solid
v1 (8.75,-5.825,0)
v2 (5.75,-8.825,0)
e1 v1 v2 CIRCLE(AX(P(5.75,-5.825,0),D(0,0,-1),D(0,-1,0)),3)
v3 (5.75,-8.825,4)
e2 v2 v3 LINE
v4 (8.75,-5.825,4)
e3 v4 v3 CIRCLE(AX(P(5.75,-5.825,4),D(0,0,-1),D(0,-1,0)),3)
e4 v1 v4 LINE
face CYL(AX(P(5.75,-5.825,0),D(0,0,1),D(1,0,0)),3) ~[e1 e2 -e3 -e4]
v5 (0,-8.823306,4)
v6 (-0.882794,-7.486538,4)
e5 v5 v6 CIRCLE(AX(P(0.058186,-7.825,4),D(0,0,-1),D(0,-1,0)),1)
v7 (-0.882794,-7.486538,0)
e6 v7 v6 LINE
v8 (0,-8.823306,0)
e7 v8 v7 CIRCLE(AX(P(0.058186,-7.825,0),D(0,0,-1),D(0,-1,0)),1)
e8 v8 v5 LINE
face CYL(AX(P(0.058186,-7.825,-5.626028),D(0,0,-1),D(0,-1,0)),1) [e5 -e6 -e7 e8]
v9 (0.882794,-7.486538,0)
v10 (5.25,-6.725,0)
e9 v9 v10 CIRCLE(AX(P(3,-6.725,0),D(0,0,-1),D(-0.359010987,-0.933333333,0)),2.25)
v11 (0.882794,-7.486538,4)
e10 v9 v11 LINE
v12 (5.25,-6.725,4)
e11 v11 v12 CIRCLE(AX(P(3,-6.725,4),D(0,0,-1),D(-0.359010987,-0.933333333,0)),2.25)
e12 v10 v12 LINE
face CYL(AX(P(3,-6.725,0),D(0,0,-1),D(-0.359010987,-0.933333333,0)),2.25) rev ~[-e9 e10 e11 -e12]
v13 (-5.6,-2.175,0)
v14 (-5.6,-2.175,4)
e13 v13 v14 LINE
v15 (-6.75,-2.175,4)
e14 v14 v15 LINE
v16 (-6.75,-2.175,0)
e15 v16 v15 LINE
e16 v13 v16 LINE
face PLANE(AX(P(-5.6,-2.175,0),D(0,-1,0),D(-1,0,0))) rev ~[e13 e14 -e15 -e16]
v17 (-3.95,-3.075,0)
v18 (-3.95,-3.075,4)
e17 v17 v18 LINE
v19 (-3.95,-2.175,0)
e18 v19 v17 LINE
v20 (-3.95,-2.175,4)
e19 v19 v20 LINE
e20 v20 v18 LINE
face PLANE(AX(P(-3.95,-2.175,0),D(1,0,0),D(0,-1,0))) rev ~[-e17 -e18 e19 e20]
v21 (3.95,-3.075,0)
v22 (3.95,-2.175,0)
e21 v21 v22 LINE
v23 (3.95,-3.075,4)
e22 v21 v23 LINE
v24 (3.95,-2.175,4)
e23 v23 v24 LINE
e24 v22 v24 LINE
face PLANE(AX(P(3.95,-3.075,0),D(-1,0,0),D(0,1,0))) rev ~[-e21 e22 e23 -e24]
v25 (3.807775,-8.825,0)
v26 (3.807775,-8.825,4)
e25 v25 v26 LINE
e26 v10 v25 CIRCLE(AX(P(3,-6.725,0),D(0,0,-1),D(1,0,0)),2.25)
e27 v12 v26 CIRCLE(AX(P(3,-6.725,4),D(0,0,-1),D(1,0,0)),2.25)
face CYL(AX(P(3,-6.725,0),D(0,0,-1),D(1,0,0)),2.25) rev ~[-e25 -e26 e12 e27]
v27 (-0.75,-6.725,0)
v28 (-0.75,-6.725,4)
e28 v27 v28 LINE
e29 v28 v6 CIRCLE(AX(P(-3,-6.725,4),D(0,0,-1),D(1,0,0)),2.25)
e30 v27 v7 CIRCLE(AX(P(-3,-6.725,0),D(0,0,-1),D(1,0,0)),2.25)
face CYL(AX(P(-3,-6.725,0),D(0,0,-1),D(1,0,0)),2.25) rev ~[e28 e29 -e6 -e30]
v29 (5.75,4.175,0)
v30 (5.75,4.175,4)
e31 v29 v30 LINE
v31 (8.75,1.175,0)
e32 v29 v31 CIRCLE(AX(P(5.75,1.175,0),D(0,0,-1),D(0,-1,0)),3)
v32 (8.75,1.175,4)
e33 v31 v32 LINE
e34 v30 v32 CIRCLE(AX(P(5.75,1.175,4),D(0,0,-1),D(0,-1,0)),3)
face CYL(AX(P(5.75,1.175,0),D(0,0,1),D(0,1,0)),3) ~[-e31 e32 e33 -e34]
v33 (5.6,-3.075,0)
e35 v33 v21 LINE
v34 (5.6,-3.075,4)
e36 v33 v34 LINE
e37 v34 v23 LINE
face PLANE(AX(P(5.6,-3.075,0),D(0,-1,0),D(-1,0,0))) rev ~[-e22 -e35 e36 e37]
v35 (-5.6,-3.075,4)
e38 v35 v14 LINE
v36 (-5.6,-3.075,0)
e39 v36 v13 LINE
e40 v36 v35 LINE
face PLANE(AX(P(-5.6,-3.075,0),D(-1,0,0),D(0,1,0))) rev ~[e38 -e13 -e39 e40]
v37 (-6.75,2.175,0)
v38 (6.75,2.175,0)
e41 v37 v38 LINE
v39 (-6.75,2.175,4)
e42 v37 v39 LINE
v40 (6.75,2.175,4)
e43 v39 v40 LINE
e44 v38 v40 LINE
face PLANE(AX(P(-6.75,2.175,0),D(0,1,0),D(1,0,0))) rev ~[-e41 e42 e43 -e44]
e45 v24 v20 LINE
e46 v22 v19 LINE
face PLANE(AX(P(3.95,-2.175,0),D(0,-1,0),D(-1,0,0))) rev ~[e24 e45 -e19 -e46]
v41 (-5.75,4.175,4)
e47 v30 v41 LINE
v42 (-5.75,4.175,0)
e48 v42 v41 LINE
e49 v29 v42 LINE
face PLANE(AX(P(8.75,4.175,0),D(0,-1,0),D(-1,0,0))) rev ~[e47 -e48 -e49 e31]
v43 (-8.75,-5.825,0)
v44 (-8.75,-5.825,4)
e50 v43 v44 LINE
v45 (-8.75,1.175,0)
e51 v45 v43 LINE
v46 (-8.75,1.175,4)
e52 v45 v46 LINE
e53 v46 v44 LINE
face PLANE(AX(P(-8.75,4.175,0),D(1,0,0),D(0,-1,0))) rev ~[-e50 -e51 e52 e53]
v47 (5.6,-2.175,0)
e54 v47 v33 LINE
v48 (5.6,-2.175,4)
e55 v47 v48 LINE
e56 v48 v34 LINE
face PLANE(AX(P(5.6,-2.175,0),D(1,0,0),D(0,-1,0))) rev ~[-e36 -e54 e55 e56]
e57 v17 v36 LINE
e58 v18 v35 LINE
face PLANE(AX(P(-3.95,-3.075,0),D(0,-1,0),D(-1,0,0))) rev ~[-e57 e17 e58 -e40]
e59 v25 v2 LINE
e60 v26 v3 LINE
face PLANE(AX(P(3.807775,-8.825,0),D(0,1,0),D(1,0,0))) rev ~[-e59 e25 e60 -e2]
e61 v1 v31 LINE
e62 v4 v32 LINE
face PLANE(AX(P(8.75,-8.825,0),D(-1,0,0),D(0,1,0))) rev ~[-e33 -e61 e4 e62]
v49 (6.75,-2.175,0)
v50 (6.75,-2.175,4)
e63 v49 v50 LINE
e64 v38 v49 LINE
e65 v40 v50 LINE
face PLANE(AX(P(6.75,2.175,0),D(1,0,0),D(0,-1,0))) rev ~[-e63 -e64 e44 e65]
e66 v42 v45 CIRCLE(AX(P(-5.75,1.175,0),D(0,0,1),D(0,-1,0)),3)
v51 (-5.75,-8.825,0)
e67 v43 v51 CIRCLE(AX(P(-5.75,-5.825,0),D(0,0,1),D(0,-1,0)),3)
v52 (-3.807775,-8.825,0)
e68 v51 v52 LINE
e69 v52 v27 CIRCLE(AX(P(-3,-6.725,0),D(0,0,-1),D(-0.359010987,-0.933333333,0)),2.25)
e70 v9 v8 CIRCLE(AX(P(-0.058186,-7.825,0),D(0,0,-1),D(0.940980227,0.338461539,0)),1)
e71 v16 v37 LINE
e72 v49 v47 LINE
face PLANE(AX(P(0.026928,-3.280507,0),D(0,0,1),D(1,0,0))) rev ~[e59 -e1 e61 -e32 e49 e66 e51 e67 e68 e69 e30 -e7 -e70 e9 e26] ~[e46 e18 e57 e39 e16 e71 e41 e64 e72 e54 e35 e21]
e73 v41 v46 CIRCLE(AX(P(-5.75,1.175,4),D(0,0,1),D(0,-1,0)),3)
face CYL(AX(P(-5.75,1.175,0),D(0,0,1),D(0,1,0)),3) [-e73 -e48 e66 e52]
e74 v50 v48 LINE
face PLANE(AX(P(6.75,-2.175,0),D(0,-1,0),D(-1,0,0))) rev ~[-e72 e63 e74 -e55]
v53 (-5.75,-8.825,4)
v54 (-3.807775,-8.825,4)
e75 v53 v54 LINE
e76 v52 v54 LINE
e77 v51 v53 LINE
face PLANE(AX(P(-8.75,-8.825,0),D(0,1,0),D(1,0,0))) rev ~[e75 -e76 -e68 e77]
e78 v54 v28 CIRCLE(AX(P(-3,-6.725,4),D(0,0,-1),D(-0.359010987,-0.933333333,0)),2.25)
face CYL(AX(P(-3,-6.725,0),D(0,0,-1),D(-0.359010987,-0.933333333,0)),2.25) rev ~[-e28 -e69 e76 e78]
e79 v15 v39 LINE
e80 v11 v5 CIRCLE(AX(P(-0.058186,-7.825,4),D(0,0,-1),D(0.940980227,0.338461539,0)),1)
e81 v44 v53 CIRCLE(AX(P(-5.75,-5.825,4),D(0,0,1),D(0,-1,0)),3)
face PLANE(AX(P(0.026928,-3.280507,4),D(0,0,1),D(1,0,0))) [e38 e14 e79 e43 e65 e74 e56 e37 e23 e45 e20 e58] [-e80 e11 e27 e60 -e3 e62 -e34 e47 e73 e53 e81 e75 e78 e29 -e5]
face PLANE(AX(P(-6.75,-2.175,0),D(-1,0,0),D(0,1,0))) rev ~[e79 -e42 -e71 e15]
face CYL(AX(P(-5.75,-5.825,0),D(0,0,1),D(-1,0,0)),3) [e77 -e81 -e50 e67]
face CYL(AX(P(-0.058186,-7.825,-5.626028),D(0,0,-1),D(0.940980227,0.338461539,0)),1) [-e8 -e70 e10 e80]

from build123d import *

# Parameters (mm, degrees)
F1_DEPTH    = 4
F2_R        = 3
F3_T1_DEPTH = 15.252055078


# Not quite as in the source:
# - a fillet or chamfer that OpenCascade refuses, or shapes differently, is made with other operations: its cross-section is extruded or revolved along the edge and cut away or added


with BuildPart() as f1:
    # F0 (on Top) → F1 (new body)
    with BuildSketch(Plane.XY):
        with BuildLine():
            Line((8.75, 4.175), (-8.75, 4.175))
            Line((-8.75, 4.175), (-8.75, -8.825))
            Line((-8.75, -8.825), (-3.8077747211, -8.825))
            ThreePointArc((-3.8077747211, -8.825), (-4.2737752701, -4.8702772279), (-0.75, -6.725))
            ThreePointArc((-0.75, -6.725), (-1.1452772279, -7.9987752701), (-2.1922252789, -8.825))
            Line((-2.1922252789, -8.825), (2.1922252789, -8.825))
            ThreePointArc((2.1922252789, -8.825), (1.7262247299, -4.8702772279), (5.25, -6.725))
            ThreePointArc((5.25, -6.725), (4.8547227721, -7.9987752701), (3.8077747211, -8.825))
            Line((3.8077747211, -8.825), (8.75, -8.825))
            Line((8.75, -8.825), (8.75, 4.175))
        make_face()
        Polygon((-6.75, 2.175), (6.75, 2.175), (6.75, -2.175), (5.6, -2.175), (5.6, -3.075), (3.95, -3.075), (3.95, -2.175), (-3.95, -2.175), (-3.95, -3.075), (-5.6, -3.075), (-5.6, -2.175), (-6.75, -2.175), align=None, mode=Mode.SUBTRACT)
    extrude(amount=F1_DEPTH)

    # F2
    f2_edges = [f1.edges().sort_by_distance(p)[0] for p in [
        (-8.75, 4.175, 2),
        (-8.75, -8.825, 2),
        (8.75, -8.825, 2),
        (8.75, 4.175, 2),
    ]]
    fillet(f2_edges, radius=F2_R)

    # F3: fillet of radius 1 on 2 edges, made by hand

    # F3_s2 → F3_t1 (cut)
    with BuildSketch(Plane.XY.offset(-5.626027539)):
        with BuildLine():
            ThreePointArc((0.88279449, -7.4865384615), (0.7598795231, -8.4001254044), (-0.0581857367, -8.825))
            Line((-0.0581857367, -8.825), (2.1922252789, -8.825))
            ThreePointArc((2.1922252789, -8.825), (1.3916632316, -8.2984525222), (0.88279449, -7.4865384615))
        make_face()
        with BuildLine():
            ThreePointArc((0.0581857367, -8.825), (-0.7598795231, -8.4001254044), (-0.88279449, -7.4865384615))
            ThreePointArc((-0.88279449, -7.4865384615), (-1.3916632316, -8.2984525222), (-2.1922252789, -8.825))
            Line((-2.1922252789, -8.825), (0.0581857367, -8.825))
        make_face()
    extrude(amount=F3_T1_DEPTH, mode=Mode.SUBTRACT)


solid = f1.part
